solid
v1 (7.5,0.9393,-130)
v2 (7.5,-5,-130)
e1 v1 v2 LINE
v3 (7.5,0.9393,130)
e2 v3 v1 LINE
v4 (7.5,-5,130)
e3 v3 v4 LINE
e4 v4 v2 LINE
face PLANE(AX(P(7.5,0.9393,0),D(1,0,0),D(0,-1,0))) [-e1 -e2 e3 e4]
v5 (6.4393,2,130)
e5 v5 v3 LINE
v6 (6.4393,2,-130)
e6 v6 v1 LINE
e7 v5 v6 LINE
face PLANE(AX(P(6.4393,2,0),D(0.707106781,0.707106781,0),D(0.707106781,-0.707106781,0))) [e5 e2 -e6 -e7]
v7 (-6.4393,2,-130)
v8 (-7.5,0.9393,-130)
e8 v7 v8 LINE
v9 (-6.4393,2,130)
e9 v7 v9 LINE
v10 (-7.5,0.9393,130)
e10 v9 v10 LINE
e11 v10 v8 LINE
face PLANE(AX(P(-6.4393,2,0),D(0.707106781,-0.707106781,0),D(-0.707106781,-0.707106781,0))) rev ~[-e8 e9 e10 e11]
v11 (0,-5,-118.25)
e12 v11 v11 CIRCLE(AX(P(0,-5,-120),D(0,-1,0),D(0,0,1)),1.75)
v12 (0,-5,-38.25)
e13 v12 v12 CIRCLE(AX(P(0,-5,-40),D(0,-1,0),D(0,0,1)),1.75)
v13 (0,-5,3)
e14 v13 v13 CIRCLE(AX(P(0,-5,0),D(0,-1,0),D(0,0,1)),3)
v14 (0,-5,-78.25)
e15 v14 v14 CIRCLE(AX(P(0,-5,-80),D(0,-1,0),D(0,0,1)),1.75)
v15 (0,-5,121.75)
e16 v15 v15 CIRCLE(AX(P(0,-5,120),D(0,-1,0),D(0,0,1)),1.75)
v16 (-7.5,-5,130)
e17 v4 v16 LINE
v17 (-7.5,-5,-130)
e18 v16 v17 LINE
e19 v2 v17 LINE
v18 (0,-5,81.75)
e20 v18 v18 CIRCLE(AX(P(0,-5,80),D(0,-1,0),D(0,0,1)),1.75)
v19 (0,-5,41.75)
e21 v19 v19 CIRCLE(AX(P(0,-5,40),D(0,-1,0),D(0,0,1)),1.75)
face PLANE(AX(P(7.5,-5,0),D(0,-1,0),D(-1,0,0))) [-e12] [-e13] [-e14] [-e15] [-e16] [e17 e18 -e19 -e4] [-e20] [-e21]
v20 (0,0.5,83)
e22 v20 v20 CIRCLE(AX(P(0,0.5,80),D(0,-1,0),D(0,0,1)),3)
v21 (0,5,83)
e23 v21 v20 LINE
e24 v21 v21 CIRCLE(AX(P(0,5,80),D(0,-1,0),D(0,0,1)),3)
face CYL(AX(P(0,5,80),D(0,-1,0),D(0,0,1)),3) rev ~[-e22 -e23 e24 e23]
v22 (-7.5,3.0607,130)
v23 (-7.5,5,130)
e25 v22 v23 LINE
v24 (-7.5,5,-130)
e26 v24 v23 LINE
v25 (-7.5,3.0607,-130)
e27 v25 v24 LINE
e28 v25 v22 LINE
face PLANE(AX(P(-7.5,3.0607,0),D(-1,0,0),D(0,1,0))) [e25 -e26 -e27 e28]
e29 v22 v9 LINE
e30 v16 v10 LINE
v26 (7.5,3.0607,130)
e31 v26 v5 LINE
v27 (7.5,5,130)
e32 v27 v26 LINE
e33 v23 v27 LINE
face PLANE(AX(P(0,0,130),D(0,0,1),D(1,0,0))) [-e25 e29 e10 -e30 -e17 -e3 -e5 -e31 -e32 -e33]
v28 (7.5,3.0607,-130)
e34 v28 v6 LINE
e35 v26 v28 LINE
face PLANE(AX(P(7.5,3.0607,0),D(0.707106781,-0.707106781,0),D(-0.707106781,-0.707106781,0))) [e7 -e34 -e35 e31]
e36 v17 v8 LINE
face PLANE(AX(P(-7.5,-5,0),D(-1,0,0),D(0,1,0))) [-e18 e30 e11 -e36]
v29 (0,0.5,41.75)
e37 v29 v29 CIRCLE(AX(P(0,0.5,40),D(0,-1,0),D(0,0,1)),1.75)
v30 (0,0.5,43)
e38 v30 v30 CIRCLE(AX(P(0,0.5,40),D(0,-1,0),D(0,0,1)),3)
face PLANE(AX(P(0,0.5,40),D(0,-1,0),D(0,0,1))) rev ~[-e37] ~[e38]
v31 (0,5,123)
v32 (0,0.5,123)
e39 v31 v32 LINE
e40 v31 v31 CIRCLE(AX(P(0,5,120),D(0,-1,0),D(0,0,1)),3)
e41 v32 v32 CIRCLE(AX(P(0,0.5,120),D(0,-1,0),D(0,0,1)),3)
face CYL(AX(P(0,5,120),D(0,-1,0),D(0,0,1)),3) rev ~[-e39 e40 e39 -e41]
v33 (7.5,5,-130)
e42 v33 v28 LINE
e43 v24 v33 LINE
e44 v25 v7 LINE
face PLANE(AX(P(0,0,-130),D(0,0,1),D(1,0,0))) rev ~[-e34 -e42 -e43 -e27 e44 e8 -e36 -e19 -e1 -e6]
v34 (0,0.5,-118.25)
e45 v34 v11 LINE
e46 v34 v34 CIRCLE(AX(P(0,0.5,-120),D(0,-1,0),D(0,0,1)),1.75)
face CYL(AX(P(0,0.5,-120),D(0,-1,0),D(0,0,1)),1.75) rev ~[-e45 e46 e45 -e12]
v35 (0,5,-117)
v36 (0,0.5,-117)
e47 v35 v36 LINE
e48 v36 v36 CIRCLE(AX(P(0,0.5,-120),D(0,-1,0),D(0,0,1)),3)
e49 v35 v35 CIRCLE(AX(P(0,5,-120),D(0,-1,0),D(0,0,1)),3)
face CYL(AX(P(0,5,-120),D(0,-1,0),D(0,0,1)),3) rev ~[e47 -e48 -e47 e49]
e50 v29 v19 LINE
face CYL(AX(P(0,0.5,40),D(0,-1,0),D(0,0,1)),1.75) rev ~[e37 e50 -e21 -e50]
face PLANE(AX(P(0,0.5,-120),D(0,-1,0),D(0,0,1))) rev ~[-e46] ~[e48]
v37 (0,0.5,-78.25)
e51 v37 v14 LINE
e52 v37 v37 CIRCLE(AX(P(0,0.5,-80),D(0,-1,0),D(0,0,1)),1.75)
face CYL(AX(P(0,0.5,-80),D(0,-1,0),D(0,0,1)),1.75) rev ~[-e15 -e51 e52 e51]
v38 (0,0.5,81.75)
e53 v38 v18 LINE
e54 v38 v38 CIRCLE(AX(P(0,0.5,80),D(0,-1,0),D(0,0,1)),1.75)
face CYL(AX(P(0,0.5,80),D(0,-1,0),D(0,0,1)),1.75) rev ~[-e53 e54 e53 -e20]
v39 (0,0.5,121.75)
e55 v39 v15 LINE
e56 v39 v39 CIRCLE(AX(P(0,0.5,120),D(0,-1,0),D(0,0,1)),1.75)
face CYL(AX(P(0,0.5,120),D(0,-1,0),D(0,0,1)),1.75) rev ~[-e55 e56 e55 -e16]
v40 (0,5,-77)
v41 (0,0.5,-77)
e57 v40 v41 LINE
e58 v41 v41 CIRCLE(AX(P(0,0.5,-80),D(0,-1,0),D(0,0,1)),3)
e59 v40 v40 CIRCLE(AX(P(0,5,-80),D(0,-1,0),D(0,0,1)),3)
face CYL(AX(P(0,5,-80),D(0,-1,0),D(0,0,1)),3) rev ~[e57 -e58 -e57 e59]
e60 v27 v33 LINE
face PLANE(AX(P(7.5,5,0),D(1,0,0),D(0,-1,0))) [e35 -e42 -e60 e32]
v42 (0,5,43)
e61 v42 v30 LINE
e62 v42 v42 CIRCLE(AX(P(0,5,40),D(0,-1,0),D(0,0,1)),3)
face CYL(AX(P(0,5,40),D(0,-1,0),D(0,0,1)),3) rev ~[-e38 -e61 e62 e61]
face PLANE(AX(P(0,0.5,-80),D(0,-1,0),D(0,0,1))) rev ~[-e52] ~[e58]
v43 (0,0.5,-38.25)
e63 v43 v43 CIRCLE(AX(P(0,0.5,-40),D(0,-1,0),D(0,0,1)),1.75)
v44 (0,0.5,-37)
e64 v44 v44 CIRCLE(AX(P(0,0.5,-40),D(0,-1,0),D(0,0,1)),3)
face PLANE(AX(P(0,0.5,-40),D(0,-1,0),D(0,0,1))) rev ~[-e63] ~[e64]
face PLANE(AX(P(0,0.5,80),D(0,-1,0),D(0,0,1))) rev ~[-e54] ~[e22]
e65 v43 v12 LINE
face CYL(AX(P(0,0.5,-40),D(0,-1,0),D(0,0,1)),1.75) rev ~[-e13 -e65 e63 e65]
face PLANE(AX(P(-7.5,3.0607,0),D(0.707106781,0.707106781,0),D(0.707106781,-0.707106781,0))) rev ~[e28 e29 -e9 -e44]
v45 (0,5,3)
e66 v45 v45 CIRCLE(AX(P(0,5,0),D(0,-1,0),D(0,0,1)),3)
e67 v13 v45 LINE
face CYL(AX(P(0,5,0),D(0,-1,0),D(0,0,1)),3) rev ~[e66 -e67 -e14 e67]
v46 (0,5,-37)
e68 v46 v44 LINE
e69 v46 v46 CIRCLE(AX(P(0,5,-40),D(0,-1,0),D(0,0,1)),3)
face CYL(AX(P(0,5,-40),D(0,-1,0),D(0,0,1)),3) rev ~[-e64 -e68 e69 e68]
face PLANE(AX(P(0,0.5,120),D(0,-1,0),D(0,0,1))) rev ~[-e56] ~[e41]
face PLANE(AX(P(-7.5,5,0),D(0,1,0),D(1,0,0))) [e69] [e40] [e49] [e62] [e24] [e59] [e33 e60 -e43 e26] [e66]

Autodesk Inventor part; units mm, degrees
ref_plane "YZ Plane" through (0, 0, 0) normal (1, 0, 0) x (0, 1, 0)
ref_plane "XZ Plane" through (0, 0, 0) normal (0, 1, 0) x (-1, 0, 0)
ref_plane "XY Plane" through (0, 0, 0) normal (0, 0, 1) x (1, 0, 0)
sketch "Sketch1" plane through (0, 0, 0) normal (0, 0, 1) x (1, 0, 0)
  line L0 (-7.5, 5) -> (7.5, 5)
  line L1 (7.5, 5) -> (7.5, -5)
  line L2 (7.5, -5) -> (-7.5, -5)
  line L3 (-7.5, -5) -> (-7.5, 5)
  line L4 (-7.5, 5) -> (7.5, -5) construction
  line L5 (7.5, 5) -> (-7.5, -5) construction
  line L6 (-7.5, 3.0607) -> (-6.4393, 2)
  line L7 (-7.5, 3.0607) -> (-6, 3.0607) construction
  line L8 (-6.4393, 2) -> (-7.5, 0.9393)
  line L9 (0, 5) -> (0, -5) construction
  line L10 (7.5, 3.0607) -> (6.4393, 2)
  line L11 (6.4393, 2) -> (7.5, 0.9393)
  point P0 (0, 0)
  point P1 (7.5, 0.9393)
  point P2 (7.5, 3.0607)
  dimension "d0" = 15
  dimension "d1" = 10
  dimension "d2" = 45
  dimension "d3" = 3
  dimension "d4" = 1.5
extrude "Extrusion1" add sketch "Sketch1" along normal mid plane 260 contours L0 L1 L10 L11 L2 L3 L8 L6
sketch "Sketch2" plane through (-7.5, 5, 130) normal (0, 1, 0) x (1, 0, 0)
  point P0 (7.5, 130)
  point P1 (7.5, 130)
hole "Hole1" at (0, 5, 0) direction (0, -1, 0) diameter 3.5 end through all counterbore diameter 6 counterbore depth 4.5
pattern_linear "Rectangular Pattern1" count 9 spacing 40 along (0, 0, 1) of "Hole1" first direction both ways yes
sketch "Sketch3" plane through (-7.5, 5, 130) normal (0, 1, 0) x (1, 0, 0)
  point P0 (7.5, 130)
  point P1 (7.5, 130)
hole "Hole2" at (0, 5, 0) direction (0, -1, 0) diameter 6 end through all
properties part number "MGN15 Rail" material "Stainless Steel, 440C"
